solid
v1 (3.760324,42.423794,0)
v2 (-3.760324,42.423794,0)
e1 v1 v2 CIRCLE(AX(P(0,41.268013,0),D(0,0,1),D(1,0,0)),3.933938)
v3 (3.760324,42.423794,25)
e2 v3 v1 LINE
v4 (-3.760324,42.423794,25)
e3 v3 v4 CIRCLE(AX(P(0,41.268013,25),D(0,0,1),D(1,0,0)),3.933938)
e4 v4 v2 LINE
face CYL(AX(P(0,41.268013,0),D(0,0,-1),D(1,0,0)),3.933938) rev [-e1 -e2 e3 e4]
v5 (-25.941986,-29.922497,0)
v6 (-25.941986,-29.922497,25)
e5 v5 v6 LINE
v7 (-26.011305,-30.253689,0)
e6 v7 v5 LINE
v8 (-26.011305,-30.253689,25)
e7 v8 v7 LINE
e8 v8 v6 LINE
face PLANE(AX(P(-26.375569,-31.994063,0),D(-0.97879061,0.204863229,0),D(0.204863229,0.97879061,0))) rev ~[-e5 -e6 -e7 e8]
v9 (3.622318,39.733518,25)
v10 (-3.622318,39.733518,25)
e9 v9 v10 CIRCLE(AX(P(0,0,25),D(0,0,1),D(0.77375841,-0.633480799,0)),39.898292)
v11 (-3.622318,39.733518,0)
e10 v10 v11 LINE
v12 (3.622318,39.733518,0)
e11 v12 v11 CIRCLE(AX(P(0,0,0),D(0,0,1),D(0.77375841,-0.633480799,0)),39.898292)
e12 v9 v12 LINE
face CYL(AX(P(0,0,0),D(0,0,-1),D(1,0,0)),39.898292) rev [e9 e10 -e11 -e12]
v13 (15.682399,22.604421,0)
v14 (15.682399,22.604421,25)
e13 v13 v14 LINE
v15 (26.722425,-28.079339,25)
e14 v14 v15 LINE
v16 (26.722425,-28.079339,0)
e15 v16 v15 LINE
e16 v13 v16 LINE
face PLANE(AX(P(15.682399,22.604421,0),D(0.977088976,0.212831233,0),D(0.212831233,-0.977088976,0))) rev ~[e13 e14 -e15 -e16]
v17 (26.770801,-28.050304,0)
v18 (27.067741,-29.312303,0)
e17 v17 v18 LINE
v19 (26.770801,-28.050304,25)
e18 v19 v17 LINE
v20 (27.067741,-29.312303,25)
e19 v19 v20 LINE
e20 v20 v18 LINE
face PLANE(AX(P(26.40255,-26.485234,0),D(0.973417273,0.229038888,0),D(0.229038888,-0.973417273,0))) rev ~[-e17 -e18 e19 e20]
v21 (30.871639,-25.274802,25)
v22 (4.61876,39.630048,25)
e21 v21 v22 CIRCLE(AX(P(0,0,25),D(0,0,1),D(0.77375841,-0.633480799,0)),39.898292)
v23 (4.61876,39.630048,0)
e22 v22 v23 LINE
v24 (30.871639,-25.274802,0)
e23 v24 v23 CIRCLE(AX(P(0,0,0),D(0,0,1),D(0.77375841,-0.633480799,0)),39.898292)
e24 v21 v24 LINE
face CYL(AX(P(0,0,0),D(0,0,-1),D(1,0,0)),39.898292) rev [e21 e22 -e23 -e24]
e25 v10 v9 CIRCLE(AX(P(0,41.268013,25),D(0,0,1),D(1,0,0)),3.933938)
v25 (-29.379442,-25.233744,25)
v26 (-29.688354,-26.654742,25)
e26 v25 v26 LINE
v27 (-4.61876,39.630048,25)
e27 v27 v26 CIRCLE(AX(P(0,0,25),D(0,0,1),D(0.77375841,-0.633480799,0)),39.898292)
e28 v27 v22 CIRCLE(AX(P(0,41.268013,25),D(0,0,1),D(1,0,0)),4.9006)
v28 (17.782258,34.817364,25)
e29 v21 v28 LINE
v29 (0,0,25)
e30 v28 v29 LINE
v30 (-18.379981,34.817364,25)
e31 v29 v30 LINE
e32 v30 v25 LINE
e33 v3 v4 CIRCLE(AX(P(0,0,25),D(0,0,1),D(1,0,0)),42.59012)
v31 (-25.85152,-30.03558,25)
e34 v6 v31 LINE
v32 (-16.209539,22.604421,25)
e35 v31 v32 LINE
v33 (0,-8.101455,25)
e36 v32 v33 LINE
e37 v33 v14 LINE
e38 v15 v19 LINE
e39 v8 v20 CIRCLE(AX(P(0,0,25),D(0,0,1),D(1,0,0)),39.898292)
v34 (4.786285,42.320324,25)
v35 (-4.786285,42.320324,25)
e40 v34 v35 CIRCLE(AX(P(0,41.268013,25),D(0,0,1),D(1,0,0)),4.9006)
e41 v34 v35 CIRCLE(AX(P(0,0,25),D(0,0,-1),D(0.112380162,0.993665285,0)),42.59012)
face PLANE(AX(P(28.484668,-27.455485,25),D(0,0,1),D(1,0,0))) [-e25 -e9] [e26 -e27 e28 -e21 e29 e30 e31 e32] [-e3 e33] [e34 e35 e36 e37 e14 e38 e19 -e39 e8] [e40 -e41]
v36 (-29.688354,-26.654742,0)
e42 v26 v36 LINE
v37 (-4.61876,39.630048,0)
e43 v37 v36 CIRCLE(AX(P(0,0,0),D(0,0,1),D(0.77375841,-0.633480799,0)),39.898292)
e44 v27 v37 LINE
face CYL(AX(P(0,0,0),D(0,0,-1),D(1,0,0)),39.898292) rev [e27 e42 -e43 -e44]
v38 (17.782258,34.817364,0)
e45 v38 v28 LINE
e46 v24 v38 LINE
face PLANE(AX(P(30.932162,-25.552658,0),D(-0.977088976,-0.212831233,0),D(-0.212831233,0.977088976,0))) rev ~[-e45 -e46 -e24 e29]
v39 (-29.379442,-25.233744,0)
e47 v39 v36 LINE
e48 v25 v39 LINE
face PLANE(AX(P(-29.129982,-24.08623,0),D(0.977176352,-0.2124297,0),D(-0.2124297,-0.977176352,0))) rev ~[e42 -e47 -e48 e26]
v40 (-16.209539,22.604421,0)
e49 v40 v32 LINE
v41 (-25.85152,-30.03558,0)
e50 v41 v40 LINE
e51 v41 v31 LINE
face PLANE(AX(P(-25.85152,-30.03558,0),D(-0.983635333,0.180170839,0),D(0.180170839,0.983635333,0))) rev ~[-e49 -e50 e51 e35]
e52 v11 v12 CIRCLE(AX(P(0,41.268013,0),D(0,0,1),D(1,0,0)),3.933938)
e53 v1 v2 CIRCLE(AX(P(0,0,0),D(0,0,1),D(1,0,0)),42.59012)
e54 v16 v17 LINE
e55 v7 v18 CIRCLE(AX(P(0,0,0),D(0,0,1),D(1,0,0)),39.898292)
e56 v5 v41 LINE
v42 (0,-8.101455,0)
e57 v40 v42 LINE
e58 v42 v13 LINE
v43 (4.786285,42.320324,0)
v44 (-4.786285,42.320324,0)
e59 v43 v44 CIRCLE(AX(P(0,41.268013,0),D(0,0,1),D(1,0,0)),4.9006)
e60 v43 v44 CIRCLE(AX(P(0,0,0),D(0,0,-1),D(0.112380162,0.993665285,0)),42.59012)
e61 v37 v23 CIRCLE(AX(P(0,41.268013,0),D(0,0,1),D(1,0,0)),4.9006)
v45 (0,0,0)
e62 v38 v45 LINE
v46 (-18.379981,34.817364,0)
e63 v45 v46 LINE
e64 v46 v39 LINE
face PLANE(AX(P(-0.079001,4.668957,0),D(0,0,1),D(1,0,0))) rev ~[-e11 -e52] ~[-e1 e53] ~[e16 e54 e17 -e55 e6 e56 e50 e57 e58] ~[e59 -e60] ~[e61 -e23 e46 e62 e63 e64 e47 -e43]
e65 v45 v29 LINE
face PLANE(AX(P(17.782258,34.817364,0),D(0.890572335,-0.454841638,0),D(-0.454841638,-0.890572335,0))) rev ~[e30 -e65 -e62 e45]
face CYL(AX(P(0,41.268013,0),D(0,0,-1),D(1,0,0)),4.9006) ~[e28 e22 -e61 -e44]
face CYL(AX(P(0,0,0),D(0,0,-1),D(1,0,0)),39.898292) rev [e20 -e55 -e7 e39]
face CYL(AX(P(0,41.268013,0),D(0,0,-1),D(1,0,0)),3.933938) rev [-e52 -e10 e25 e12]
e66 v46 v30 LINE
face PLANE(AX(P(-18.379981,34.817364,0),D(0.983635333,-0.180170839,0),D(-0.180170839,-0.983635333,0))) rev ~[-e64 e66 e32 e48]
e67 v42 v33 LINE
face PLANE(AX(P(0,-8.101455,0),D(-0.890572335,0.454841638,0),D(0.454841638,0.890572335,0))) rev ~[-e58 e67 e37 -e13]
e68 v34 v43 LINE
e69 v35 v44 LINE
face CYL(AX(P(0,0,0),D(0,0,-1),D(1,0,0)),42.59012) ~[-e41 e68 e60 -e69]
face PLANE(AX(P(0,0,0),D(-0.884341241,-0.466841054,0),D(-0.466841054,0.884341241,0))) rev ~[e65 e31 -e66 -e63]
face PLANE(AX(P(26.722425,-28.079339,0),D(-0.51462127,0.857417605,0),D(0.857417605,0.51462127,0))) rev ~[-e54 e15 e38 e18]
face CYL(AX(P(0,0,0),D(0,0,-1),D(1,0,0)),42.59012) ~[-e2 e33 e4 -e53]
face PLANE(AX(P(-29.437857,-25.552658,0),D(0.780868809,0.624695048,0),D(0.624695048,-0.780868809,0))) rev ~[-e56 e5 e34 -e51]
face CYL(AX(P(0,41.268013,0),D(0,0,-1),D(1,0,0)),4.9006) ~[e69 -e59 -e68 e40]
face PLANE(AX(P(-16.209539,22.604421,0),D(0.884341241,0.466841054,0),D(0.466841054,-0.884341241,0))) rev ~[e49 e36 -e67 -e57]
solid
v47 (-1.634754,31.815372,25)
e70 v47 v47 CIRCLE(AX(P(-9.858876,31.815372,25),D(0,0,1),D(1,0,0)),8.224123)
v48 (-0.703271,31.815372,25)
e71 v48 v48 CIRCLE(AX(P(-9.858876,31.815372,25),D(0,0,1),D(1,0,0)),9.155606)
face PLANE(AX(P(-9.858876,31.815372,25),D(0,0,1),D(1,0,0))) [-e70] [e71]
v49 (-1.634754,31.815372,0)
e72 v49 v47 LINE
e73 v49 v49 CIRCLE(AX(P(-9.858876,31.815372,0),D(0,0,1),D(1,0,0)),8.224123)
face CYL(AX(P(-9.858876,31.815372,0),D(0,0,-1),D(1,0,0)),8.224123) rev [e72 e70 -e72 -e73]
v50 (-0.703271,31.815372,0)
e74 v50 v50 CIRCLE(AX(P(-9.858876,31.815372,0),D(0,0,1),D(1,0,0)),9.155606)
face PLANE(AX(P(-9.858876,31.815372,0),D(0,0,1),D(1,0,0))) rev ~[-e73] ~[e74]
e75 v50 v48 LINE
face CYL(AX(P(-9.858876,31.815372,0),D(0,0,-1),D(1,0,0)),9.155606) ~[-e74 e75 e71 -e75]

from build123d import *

# Parameters (mm, degrees)
F0_R      = 42.5901202059
F0_R_2    = 39.8982916651
F1_DEPTH  = 25
F3_DEPTH  = 25
F5_DEPTH  = 25
F7_DEPTH  = 25
F8_R      = 4.9005997311
F8_R_2    = 3.9339377278
F9_DEPTH  = 25
F10_R     = 9.1556057754
F10_R_2   = 8.2241228005
F12_DEPTH = 25


# Not quite as in the source:
# - the program builds the solid bodies; features that only make, move or delete a surface that nothing else refers to are left out


with BuildPart() as f1:
    # F0 (on Top) → F1 (new body)
    with BuildSketch(Plane.XY):
        Circle(F0_R)
        Circle(F0_R_2, mode=Mode.SUBTRACT)
    extrude(amount=F1_DEPTH)

    # F2 (on Top) → F3 (join)
    with BuildSketch(Plane.XY):
        Polygon((-18.3799806982, 34.8173640668), (-29.4378567487, -25.5526583642), (-25.8515197784, -30.0355795771), (-16.209538835, 22.6044213756), (0, -8.1014549928), (15.6823994675, 22.6044213756), (26.7224249176, -28.0793387221), (30.932161957, -25.5526583642), (17.7822578698, 34.8173640668), (0, 0), align=None)
    extrude(amount=F3_DEPTH)

    # F4 (on Top) → F5 (join)
    with BuildSketch(Plane.XY):
        Polygon((-25.5759004503, -28.1734243035), (-29.1299819946, -24.0862295032), (-30.0185028464, -28.1734243035), (-26.3755694032, -31.9940634072), align=None)
    extrude(amount=F5_DEPTH)

    # F6 (on Top) → F7 (join)
    with BuildSketch(Plane.XY):
        Polygon((29.9566332251, -24.3527851999), (26.4025498182, -26.485234499), (27.4687726051, -31.0166906565), (30.9340041131, -26.3075307012), align=None)
    extrude(amount=F7_DEPTH)

    # F8 (on Top) → F9 (join)
    with BuildSketch(Plane.XY):
        with Locations((0, 41.2680134177)):
            Circle(F8_R)
        with Locations((0, 41.2680134177)):
            Circle(F8_R_2, mode=Mode.SUBTRACT)
    extrude(amount=F9_DEPTH)


with BuildPart() as f12:
    # F10 (on Top) → F12 (new body)
    with BuildSketch(Plane.XY):
        with Locations((-9.8588764668, 31.8153724074)):
            Circle(F10_R)
        with Locations((-9.8588764668, 31.8153724074)):
            Circle(F10_R_2, mode=Mode.SUBTRACT)
    extrude(amount=F12_DEPTH)


solid = Compound([f1.part, f12.part])
